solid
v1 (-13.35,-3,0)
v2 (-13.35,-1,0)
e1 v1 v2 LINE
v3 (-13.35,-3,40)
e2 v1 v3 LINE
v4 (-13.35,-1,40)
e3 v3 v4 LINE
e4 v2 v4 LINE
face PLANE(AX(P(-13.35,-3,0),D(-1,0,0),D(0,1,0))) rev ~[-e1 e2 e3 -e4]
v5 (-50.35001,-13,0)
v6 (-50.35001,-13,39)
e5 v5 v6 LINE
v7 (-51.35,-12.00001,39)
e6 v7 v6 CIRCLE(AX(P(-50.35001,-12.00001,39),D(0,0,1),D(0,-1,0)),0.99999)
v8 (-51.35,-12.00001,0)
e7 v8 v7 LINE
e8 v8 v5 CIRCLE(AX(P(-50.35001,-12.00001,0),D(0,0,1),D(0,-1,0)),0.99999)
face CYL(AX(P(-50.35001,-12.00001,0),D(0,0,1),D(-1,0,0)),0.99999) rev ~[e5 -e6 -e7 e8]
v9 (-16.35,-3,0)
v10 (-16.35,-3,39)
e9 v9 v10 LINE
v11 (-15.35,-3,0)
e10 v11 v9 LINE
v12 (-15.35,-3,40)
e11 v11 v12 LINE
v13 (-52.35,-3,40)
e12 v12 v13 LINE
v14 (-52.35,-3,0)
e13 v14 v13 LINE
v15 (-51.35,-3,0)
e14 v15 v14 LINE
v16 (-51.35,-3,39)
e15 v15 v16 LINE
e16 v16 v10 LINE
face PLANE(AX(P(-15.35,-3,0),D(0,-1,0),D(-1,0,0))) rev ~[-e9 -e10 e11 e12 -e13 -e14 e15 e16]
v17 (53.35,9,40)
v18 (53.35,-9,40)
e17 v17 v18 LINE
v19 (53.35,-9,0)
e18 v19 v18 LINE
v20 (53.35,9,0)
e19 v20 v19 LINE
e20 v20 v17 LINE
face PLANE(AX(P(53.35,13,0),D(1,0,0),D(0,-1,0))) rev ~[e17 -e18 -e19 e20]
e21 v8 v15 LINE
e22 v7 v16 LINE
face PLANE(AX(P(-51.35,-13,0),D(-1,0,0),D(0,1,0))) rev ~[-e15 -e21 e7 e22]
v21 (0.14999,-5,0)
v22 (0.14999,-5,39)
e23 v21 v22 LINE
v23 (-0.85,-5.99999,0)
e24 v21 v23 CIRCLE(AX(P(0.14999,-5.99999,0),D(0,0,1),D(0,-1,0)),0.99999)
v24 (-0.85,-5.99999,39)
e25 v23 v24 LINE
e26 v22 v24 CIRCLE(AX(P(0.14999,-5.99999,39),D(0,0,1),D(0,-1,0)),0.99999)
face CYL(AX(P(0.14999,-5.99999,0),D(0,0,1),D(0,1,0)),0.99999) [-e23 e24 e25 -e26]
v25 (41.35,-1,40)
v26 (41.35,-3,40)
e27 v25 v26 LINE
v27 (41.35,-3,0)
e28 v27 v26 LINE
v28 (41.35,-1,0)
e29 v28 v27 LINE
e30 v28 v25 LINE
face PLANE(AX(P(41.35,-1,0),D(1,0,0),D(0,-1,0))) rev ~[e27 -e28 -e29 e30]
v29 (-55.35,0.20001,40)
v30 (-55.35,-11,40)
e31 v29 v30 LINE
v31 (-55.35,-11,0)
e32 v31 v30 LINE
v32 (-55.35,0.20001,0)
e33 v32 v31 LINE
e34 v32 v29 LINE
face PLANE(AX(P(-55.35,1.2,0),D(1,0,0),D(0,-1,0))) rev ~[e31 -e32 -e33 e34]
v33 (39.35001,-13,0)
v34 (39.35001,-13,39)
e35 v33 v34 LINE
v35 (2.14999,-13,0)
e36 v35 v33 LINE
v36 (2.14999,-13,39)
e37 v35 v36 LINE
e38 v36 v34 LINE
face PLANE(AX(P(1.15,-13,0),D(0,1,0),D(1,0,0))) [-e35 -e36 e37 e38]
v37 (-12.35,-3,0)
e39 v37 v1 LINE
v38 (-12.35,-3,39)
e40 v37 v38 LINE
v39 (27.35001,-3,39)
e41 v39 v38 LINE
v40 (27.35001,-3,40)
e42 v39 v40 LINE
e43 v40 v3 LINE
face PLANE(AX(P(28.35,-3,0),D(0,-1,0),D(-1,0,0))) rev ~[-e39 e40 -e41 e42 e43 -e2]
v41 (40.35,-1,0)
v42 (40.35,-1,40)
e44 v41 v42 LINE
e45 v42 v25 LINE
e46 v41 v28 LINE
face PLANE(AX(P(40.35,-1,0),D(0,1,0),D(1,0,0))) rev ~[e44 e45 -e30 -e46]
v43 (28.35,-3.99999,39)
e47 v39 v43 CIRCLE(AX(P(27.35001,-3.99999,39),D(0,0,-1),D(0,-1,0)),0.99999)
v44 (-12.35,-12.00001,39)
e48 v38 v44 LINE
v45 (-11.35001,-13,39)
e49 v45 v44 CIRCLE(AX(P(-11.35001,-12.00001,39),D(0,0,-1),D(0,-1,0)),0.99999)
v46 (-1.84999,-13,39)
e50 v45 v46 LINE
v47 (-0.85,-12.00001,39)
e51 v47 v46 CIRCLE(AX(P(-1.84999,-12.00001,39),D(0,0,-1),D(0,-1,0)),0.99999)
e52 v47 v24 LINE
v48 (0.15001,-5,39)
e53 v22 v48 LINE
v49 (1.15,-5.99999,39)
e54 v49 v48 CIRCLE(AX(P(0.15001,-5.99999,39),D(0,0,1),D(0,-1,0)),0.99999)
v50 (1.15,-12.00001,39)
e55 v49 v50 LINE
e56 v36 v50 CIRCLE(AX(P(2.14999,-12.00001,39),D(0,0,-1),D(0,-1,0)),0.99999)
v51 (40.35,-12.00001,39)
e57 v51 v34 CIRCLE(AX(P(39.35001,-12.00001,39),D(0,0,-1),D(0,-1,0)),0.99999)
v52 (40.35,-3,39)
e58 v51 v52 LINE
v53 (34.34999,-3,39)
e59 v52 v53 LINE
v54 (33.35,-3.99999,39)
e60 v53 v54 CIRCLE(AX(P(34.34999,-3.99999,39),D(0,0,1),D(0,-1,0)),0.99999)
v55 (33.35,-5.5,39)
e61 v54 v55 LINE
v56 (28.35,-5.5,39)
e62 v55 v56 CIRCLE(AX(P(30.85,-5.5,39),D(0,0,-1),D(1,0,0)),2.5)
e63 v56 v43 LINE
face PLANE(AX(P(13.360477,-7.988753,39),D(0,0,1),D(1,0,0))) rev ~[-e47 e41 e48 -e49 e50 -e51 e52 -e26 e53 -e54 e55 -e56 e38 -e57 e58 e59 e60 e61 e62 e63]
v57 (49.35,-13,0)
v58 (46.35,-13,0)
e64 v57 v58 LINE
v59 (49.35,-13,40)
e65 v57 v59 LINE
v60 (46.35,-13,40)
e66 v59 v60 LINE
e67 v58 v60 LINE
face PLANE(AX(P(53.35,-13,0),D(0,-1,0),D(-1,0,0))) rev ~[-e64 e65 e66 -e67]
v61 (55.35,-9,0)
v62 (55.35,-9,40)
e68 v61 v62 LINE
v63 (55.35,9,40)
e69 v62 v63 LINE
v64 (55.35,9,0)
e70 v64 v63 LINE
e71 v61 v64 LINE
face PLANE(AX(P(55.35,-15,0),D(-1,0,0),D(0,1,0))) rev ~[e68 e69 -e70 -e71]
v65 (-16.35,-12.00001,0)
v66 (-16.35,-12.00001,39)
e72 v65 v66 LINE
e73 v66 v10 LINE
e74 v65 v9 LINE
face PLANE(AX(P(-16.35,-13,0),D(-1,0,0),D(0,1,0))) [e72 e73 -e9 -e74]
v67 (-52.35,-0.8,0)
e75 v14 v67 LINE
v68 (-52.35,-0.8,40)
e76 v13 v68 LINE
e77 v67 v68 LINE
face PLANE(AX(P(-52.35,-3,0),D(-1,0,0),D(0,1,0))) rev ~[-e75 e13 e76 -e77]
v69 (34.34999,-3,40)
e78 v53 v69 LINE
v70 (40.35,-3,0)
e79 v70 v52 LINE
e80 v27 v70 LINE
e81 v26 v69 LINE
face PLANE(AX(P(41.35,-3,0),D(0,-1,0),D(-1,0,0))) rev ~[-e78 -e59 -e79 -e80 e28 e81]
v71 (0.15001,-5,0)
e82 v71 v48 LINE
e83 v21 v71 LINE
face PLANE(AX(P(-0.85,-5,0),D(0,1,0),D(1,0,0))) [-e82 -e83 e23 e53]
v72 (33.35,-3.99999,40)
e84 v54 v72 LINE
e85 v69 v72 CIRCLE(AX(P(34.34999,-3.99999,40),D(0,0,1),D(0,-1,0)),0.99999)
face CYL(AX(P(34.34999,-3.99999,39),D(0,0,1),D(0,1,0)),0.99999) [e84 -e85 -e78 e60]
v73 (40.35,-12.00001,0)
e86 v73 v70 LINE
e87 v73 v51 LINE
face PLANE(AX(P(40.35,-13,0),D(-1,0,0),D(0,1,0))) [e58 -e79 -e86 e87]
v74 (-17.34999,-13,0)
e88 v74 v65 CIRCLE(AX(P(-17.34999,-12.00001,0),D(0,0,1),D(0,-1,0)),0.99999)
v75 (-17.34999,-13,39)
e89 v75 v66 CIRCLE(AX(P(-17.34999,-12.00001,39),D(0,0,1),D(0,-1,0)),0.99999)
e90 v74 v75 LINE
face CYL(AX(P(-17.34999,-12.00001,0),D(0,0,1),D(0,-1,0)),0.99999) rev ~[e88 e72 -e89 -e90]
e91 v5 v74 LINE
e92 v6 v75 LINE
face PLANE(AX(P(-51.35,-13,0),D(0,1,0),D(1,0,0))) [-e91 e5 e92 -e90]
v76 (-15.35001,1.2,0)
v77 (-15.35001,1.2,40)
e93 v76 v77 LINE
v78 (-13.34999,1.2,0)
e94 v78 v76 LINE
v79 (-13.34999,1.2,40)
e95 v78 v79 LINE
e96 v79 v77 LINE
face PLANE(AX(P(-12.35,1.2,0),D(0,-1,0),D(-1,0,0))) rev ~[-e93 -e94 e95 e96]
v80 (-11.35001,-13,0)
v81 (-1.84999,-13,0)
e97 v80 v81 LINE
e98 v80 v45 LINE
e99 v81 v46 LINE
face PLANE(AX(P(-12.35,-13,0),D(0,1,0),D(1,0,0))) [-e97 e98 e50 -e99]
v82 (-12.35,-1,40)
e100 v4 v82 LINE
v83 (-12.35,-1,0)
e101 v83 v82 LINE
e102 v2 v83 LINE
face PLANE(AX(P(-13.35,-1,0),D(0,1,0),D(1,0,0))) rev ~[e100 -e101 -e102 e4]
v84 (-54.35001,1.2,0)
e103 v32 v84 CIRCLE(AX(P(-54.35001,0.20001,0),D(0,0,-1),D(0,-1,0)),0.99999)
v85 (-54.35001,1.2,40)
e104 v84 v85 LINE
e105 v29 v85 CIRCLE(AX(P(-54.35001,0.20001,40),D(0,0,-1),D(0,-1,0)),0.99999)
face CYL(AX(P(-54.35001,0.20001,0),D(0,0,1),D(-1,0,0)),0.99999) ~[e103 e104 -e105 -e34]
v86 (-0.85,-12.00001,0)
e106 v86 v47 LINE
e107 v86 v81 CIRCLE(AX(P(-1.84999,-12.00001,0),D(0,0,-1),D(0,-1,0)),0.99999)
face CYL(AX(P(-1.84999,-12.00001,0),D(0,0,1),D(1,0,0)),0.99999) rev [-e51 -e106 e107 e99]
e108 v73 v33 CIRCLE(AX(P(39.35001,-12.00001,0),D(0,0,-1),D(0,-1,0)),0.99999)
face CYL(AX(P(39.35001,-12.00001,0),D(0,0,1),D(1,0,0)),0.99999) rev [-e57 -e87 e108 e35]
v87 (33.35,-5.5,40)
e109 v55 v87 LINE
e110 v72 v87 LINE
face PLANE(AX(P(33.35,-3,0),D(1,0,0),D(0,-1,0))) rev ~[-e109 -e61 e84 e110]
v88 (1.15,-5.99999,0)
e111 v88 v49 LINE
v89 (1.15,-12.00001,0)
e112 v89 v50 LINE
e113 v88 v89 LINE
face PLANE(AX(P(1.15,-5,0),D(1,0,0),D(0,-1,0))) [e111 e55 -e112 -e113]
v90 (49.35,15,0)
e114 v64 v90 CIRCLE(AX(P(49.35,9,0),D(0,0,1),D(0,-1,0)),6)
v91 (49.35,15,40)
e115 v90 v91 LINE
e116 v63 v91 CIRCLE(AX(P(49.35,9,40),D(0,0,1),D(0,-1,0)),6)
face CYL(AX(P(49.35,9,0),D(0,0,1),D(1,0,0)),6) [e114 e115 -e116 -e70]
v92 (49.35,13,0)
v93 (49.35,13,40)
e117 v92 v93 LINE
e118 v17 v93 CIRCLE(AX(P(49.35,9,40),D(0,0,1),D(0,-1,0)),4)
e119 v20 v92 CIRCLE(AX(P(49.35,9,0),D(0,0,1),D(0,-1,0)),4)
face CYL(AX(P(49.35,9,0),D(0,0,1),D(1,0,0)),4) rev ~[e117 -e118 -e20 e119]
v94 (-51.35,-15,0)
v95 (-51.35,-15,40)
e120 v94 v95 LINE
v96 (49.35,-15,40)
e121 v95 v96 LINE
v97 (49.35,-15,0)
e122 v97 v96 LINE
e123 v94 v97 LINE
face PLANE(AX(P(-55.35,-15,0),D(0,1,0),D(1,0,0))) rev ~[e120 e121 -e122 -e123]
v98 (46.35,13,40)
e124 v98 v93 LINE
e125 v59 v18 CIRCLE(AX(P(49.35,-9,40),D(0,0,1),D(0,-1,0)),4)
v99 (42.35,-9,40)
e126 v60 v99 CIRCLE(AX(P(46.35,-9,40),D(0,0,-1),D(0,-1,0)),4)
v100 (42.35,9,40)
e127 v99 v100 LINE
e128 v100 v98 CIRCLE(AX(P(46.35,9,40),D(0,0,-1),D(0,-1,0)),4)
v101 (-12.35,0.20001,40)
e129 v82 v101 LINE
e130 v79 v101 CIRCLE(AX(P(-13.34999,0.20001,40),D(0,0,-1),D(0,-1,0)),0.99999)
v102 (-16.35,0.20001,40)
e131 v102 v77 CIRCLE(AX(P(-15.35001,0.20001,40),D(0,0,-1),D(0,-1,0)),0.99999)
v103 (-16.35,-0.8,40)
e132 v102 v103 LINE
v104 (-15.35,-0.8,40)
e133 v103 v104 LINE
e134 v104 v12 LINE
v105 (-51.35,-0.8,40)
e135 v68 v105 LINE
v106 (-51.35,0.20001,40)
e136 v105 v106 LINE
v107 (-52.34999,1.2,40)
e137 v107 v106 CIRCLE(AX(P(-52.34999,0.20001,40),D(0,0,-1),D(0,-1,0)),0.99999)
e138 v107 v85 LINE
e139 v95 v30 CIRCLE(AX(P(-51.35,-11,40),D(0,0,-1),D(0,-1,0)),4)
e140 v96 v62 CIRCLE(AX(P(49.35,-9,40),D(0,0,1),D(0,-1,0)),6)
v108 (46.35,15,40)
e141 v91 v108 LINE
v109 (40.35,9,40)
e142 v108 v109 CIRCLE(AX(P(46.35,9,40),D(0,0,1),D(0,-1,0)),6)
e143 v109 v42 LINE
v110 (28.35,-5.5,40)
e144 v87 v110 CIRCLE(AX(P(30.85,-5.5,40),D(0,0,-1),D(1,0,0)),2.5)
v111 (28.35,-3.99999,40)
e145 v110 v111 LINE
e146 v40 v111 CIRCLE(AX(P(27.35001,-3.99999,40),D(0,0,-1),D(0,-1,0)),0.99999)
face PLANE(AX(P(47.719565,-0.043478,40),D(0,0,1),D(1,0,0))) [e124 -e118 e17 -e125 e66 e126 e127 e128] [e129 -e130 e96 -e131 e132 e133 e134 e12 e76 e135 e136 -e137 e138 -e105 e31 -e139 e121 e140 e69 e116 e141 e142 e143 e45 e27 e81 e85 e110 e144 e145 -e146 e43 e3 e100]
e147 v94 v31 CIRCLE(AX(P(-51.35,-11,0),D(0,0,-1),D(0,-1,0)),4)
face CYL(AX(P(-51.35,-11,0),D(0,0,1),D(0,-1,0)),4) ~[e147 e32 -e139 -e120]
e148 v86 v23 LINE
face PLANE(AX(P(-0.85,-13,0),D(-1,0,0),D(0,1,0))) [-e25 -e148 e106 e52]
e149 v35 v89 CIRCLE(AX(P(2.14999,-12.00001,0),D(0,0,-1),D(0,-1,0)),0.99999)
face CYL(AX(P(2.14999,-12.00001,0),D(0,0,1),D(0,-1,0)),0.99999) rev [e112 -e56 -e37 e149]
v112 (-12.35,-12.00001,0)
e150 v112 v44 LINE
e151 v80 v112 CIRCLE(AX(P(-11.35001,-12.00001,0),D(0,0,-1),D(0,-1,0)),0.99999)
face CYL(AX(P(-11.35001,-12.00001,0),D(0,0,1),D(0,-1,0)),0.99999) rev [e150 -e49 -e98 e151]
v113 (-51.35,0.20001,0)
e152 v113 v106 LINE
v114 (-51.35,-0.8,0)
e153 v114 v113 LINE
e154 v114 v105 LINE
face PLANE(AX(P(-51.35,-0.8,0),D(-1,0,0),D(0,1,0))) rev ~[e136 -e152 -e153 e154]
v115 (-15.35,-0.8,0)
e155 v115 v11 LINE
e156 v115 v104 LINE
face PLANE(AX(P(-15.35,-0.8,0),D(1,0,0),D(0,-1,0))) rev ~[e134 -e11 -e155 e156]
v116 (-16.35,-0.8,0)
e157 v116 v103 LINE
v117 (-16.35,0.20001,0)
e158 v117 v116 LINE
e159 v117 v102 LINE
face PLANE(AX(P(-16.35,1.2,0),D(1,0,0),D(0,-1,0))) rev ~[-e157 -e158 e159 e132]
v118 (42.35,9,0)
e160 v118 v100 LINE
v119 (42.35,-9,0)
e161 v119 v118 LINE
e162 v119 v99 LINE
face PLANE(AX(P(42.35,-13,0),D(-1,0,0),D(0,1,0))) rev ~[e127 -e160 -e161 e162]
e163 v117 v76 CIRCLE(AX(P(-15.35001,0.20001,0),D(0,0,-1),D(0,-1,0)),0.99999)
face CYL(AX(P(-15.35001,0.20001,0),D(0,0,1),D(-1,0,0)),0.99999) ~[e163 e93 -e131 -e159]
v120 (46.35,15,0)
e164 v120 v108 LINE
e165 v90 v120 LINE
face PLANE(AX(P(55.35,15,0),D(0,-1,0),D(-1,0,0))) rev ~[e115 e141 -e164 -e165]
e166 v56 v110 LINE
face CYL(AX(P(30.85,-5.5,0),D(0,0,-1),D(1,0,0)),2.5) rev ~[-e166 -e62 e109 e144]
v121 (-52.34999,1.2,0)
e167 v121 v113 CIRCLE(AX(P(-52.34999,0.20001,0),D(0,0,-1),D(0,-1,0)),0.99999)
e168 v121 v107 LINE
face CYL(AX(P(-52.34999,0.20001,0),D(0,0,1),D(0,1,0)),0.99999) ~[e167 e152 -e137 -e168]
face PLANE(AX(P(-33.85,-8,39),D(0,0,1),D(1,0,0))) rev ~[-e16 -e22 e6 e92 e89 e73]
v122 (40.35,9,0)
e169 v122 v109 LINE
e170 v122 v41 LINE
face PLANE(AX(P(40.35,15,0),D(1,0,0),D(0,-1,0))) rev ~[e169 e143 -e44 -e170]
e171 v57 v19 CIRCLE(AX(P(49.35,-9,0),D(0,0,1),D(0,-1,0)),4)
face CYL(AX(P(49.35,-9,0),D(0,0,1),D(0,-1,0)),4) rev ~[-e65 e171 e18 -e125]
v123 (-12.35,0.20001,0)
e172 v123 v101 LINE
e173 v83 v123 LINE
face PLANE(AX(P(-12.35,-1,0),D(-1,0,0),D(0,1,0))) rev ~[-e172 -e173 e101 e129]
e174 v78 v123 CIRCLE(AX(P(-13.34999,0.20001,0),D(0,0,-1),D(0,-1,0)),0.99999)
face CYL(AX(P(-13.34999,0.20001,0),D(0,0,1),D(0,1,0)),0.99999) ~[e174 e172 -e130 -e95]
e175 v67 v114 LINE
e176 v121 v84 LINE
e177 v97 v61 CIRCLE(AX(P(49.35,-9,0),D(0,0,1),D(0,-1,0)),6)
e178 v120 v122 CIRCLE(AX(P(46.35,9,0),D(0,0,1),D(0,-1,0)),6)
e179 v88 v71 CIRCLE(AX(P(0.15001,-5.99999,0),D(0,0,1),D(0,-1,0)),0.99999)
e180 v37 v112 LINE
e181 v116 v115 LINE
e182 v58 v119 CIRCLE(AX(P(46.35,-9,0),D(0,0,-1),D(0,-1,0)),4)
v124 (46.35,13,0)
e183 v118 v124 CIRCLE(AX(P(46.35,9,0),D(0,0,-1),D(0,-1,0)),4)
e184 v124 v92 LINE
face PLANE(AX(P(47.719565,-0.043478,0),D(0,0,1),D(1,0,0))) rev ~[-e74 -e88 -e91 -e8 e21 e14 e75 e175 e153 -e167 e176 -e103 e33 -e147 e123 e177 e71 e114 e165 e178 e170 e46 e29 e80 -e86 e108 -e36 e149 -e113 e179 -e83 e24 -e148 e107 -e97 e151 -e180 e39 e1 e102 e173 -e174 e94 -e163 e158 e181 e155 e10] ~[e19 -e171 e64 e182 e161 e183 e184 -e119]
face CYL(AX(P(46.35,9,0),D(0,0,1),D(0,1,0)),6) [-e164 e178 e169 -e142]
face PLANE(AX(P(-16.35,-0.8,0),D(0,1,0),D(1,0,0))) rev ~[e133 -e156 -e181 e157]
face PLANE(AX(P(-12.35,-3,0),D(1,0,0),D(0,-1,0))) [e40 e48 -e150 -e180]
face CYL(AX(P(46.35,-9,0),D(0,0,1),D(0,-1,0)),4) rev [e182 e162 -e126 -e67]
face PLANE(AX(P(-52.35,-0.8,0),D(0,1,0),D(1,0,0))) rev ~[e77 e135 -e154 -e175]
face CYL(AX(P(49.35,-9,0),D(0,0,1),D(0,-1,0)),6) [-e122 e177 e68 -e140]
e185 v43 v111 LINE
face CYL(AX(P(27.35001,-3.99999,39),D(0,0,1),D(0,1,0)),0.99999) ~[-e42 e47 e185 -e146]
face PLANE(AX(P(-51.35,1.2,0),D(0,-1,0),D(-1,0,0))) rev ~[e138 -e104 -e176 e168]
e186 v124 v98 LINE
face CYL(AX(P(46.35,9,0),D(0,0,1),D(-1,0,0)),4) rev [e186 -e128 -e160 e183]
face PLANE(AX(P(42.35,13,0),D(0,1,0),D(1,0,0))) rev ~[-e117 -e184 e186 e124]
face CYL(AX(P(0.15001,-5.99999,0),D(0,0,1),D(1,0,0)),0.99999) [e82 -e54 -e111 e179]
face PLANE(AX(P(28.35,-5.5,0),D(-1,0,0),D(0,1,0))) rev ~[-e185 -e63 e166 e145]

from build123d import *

# Parameters (mm, degrees)
F0_W     = 2
F0_H     = 8
F0_W_2   = 35
F0_H_2   = 10
F1_DEPTH = 40
F2_DEPTH = 39
F3_R     = 4
F4_R     = 0.99999
F5_R     = 6


# Not quite as in the source:
# - a fillet or chamfer is up to 0.001 mm smaller than in the source, because OpenCascade refuses the exact size


with BuildPart() as f1:
    # F0 (on Top) → F1 (new body)
    with BuildSketch(Plane.XY):
        Polygon((40.35, -15), (55.35, -15), (55.35, 15), (40.35, 15), (40.35, 1.2), (40.35, -1), (41.35, -1), (41.35, -3), (40.35, -3), (40.35, -13), align=None)
        Polygon((42.35, -13), (42.35, 1.2), (42.35, 13), (53.35, 13), (53.35, -13), align=None, mode=Mode.SUBTRACT)
        Polygon((-55.35, -15), (40.35, -15), (40.35, -13), (1.15, -13), (-0.85, -13), (-12.35, -13), (-16.35, -13), (-51.35, -13), (-55.35, -13), align=None)
        Polygon((-12.35, -1), (-12.35, 1.2), (-16.35, 1.2), (-16.35, -0.8), (-15.35, -0.8), (-15.35, -3), (-16.35, -3), (-16.35, -13), (-12.35, -13), (-12.35, -3), (-13.35, -3), (-13.35, -1), align=None)
        Polygon((-55.35, 1.2), (-55.35, -13), (-51.35, -13), (-51.35, -3), (-52.35, -3), (-52.35, -0.8), (-51.35, -0.8), (-51.35, 1.2), align=None)
        with Locations((0.15, -9)):
            Rectangle(F0_W, F0_H)
        with Locations((-33.85, -8)):
            Rectangle(F0_W_2, F0_H_2)
        with BuildLine():
            Line((1.15, -13), (40.35, -13))
            Line((40.35, -13), (40.35, -3))
            Line((40.35, -3), (33.35, -3))
            Line((33.35, -3), (33.35, -5.5))
            ThreePointArc((33.35, -5.5), (30.85, -8), (28.35, -5.5))
            Line((28.35, -5.5), (28.35, -3))
            Line((28.35, -3), (-12.35, -3))
            Line((-12.35, -3), (-12.35, -13))
            Line((-12.35, -13), (-0.85, -13))
            Line((-0.85, -13), (-0.85, -5))
            Line((-0.85, -5), (1.15, -5))
            Line((1.15, -5), (1.15, -13))
        make_face()
    extrude(amount=F1_DEPTH)

    # F0 (on Top) → F2 (cut)
    with BuildSketch(Plane.XY):
        with Locations((-33.85, -8)):
            Rectangle(F0_W_2, F0_H_2)
        with BuildLine():
            Line((1.15, -13), (40.35, -13))
            Line((40.35, -13), (40.35, -3))
            Line((40.35, -3), (33.35, -3))
            Line((33.35, -3), (33.35, -5.5))
            ThreePointArc((33.35, -5.5), (30.85, -8), (28.35, -5.5))
            Line((28.35, -5.5), (28.35, -3))
            Line((28.35, -3), (-12.35, -3))
            Line((-12.35, -3), (-12.35, -13))
            Line((-12.35, -13), (-0.85, -13))
            Line((-0.85, -13), (-0.85, -5))
            Line((-0.85, -5), (1.15, -5))
            Line((1.15, -5), (1.15, -13))
        make_face()
    extrude(amount=F2_DEPTH, mode=Mode.SUBTRACT)

    # F3
    f3_edges = [f1.edges().sort_by_distance(p)[0] for p in [
        (42.35, -13, 20),
        (53.35, -13, 20),
        (53.35, 13, 20),
        (42.35, 13, 20),
        (-55.35, -15, 20),
    ]]
    fillet(f3_edges, radius=F3_R)

    # F4 (radius 1 in the source; OpenCascade refuses exactly that, so slightly less here)
    f4_edges = [f1.edges().sort_by_distance(p)[0] for p in [
        (40.35, -13, 19.5),
        (-0.85, -13, 19.5),
        (-0.85, -5, 19.5),
        (-16.35, -13, 19.5),
        (-16.35, 1.2, 20),
        (-12.35, 1.2, 20),
        (-55.35, 1.2, 20),
        (-51.35, 1.2, 20),
        (-51.35, -13, 19.5),
        (1.15, -5, 19.5),
        (1.15, -13, 19.5),
        (-12.35, -13, 19.5),
        (33.35, -3, 39.5),
        (28.35, -3, 39.5),
    ]]
    fillet(f4_edges, radius=F4_R)

    # F5
    f5_edges = [f1.edges().sort_by_distance(p)[0] for p in [
        (40.35, 15, 20),
        (55.35, 15, 20),
        (55.35, -15, 20),
    ]]
    fillet(f5_edges, radius=F5_R)


solid = f1.part
